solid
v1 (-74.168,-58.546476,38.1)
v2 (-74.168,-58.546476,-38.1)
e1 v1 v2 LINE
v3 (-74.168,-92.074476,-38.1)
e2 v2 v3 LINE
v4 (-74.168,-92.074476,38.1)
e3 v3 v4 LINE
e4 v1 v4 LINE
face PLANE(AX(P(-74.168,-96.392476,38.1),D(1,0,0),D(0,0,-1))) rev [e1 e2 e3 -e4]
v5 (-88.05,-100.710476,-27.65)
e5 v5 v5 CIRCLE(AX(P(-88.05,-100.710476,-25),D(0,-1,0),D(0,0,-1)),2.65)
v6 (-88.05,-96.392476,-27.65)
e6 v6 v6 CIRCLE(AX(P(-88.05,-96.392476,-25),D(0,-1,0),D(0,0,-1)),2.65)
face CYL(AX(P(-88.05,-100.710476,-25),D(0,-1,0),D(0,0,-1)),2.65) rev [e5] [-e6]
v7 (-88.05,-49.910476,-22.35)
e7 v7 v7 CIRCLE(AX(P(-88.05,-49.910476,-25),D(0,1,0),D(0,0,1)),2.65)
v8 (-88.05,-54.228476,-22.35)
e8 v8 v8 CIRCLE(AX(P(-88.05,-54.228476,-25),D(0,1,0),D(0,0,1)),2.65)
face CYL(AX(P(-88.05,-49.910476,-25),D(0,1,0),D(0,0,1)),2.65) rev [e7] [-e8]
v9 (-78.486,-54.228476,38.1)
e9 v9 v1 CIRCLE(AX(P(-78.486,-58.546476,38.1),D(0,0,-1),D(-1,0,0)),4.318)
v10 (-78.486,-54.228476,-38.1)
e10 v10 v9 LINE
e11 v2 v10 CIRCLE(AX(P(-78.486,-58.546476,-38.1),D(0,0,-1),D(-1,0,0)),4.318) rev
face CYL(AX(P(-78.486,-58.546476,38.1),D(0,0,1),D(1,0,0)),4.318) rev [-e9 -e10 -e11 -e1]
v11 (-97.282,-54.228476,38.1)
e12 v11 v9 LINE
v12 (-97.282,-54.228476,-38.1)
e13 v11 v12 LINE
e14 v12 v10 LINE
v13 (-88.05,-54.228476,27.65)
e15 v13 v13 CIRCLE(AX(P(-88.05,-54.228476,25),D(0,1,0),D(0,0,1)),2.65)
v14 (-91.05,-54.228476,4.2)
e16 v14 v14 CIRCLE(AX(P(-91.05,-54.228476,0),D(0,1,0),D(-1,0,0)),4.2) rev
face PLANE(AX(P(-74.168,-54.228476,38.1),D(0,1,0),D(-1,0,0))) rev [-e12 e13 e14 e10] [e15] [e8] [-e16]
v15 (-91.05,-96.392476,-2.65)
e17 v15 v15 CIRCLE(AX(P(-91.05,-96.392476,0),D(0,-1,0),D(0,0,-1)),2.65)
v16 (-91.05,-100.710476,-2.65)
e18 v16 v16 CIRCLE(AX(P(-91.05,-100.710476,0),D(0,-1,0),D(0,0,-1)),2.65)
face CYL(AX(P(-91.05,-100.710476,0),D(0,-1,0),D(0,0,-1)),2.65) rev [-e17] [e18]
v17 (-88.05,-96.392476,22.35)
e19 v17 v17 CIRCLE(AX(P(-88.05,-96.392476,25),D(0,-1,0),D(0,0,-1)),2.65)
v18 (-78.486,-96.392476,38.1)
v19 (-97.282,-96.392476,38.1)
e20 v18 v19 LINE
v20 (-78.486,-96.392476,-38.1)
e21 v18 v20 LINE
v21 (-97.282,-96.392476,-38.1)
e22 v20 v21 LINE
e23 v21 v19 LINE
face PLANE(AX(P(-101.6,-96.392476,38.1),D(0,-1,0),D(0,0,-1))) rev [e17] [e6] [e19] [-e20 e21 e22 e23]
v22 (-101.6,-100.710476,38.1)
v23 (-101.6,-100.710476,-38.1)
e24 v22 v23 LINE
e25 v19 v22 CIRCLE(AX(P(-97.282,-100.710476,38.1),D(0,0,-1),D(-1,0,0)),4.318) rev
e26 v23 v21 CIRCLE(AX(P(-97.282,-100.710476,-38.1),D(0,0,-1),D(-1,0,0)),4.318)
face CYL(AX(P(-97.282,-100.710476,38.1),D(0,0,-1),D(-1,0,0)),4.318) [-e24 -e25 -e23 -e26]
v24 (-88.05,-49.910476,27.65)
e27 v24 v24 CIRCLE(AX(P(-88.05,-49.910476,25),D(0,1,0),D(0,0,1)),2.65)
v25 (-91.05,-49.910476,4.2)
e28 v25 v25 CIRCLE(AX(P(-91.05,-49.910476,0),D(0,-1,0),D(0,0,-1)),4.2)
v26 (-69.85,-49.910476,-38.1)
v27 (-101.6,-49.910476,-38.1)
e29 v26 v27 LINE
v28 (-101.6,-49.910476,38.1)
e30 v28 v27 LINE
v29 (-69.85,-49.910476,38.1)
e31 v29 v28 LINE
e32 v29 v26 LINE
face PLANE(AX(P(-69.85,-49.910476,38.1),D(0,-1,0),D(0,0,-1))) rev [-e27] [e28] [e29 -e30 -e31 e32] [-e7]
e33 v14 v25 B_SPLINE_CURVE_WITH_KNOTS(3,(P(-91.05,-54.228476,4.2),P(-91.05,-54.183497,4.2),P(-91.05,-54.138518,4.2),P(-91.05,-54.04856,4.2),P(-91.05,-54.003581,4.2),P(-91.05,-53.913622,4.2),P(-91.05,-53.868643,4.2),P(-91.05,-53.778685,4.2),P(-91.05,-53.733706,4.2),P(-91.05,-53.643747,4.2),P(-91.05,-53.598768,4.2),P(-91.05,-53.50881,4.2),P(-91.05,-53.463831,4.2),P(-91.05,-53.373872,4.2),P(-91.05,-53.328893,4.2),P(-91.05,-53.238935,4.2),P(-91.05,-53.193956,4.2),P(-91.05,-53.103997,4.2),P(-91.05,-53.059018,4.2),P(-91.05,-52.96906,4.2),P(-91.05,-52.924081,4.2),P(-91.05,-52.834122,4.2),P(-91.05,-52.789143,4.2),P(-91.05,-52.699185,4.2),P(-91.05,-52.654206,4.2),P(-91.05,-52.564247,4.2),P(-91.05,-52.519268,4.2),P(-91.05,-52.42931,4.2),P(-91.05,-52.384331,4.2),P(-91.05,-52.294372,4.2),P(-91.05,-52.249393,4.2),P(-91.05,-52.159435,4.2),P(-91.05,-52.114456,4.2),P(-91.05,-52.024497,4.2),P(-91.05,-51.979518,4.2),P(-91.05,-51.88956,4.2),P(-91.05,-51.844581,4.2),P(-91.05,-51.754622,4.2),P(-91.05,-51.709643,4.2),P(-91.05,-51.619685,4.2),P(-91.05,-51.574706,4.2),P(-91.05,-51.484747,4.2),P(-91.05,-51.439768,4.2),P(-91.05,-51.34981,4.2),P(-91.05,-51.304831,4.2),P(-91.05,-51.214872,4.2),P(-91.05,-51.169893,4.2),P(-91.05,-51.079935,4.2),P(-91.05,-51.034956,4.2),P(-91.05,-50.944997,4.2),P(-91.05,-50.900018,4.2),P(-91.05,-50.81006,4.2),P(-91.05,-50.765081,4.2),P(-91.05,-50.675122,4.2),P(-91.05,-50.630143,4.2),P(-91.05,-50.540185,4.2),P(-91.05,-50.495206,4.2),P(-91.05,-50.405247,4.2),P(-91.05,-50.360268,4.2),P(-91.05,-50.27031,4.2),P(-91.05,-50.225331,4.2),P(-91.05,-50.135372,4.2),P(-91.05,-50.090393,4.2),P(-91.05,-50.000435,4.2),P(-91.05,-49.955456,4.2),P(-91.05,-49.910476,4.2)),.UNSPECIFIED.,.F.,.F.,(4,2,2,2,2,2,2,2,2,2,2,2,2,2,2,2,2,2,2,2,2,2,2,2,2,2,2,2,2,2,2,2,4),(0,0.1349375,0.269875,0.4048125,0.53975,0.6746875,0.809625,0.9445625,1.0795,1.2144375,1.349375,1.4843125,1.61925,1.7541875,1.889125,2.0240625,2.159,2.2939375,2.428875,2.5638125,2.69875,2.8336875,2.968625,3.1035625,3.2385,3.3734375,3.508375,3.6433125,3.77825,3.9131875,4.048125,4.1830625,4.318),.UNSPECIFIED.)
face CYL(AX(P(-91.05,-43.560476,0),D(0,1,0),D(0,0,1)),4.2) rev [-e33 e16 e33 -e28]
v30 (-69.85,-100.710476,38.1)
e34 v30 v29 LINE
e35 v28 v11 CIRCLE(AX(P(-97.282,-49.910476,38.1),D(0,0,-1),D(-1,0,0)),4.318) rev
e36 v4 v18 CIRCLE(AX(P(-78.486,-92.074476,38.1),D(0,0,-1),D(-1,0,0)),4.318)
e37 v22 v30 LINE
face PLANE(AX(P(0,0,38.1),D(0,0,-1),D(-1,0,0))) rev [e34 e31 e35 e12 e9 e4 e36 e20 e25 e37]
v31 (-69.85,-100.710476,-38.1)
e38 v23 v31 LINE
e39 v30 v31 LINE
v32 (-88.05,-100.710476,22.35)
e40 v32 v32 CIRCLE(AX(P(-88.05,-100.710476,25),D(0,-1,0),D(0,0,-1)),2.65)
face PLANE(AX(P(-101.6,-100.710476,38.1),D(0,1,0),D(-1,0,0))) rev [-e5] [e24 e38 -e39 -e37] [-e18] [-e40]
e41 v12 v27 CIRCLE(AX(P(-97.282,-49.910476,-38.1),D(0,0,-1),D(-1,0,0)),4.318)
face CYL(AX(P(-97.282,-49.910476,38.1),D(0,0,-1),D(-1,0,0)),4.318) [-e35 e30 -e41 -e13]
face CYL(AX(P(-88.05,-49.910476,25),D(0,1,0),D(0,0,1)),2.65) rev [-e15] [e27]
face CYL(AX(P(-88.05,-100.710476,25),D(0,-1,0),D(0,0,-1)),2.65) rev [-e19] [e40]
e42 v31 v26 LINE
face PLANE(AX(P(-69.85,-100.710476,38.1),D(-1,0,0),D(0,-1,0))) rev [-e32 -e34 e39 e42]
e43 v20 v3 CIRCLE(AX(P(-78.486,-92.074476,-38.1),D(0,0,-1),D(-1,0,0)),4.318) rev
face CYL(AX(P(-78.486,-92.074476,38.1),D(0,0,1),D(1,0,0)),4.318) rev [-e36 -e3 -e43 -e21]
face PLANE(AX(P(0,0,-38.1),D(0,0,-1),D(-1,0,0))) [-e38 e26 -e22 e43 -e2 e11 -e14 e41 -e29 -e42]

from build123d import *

# Parameters (mm, degrees)
BOSS_EXTRUDE1_DEPTH      = 38.1
FILLET1_START            = -39
FILLET1_DEPTH            = 78
FILLET1_START_2          = -38.1
FILLET1_2_DEPTH          = 76.2
M8_CLEARANCE_HOLE1_D     = 8.4
M8_CLEARANCE_HOLE1_DEPTH = 10.668
M8_CLEARANCE_HOLE1_TIP   = 2.5236146
M5_CLEARANCE_HOLE8_D     = 5.3
M5_CLEARANCE_HOLE8_DEPTH = 4.318
M5_CLEARANCE_HOLE9_D     = 5.3
M5_CLEARANCE_HOLE9_DEPTH = 4.318


with BuildPart() as part:
    # Sketch1 → Boss-Extrude1 (new, symmetric)
    with BuildSketch(Plane.XY):
        Polygon((-101.6, -100.710476364), (-69.85, -100.710476364), (-69.85, -49.910476364), (-101.6, -49.910476364), (-101.6, -54.228476364), (-74.168, -54.228476364), (-74.168, -96.392476364), (-101.6, -96.392476364), align=None)
    extrude(amount=BOSS_EXTRUDE1_DEPTH, both=True)

    # Fillet1: read off the stored shape, not the designer's step
    # Fillet1 outline → Fillet1 (cut)
    with BuildSketch(Plane.XY.offset(FILLET1_START)):
        with BuildLine():
            Line((-101.6, -54.228476364), (-97.282, -54.228476364))
            ThreePointArc((-97.282, -54.228476364), (-100.335287081, -52.963763446), (-101.6, -49.910476364))
            Line((-101.6, -49.910476364), (-101.6, -54.228476364))
        make_face()
        with BuildLine():
            ThreePointArc((-101.6, -100.710476364), (-100.335287081, -97.657189283), (-97.282, -96.392476364))
            Line((-97.282, -96.392476364), (-101.6, -96.392476364))
            Line((-101.6, -96.392476364), (-101.6, -100.710476364))
        make_face()
    extrude(amount=FILLET1_DEPTH, mode=Mode.SUBTRACT)

    # Fillet1 2 outline → Fillet1 2 (add)
    with BuildSketch(Plane.XY.offset(FILLET1_START_2)):
        with BuildLine():
            Line((-74.168, -96.392476364), (-74.168, -92.074476364))
            ThreePointArc((-74.168, -92.074476364), (-75.432712919, -95.127763446), (-78.486, -96.392476364))
            Line((-78.486, -96.392476364), (-74.168, -96.392476364))
        make_face()
        with BuildLine():
            Line((-74.168, -54.228476364), (-78.486, -54.228476364))
            ThreePointArc((-78.486, -54.228476364), (-75.432712919, -55.493189283), (-74.168, -58.546476364))
            Line((-74.168, -58.546476364), (-74.168, -54.228476364))
        make_face()
    extrude(amount=FILLET1_2_DEPTH)

    # M8 Clearance Hole1
    with Locations(Plane(origin=(-6.8, -43.560476364, 0), x_dir=(1, 0, 0), z_dir=(0, 1, 0))):
        with Locations((84.25, 0), (-84.25, 0)):
            Hole(M8_CLEARANCE_HOLE1_D / 2, depth=M8_CLEARANCE_HOLE1_DEPTH)
            with Locations((0, 0, -(M8_CLEARANCE_HOLE1_DEPTH + M8_CLEARANCE_HOLE1_TIP / 2))):  # 118° drill point
                Cone(0, M8_CLEARANCE_HOLE1_D / 2, M8_CLEARANCE_HOLE1_TIP, mode=Mode.SUBTRACT)

    # M5 Clearance Hole8
    with Locations(Plane(origin=(-6.8, -49.910476364, 0), x_dir=(-1, 0, 0), z_dir=(0, 1, 0))):
        with Locations((81.25, 25), (81.25, -25), (-81.25, -25), (-81.25, 25)):
            Hole(M5_CLEARANCE_HOLE8_D / 2, depth=M5_CLEARANCE_HOLE8_DEPTH)

    # M5 Clearance Hole9
    with Locations(Plane(origin=(-6.8, -100.710476364, 0), x_dir=(1, 0, 0), z_dir=(0, -1, 0))):
        with Locations((-81.25, -25), (-81.25, 25), (83.05, 25), (83.05, -25), (-84.25, 0), (84.25, 0)):
            Hole(M5_CLEARANCE_HOLE9_D / 2, depth=M5_CLEARANCE_HOLE9_DEPTH)


solid = part.part
